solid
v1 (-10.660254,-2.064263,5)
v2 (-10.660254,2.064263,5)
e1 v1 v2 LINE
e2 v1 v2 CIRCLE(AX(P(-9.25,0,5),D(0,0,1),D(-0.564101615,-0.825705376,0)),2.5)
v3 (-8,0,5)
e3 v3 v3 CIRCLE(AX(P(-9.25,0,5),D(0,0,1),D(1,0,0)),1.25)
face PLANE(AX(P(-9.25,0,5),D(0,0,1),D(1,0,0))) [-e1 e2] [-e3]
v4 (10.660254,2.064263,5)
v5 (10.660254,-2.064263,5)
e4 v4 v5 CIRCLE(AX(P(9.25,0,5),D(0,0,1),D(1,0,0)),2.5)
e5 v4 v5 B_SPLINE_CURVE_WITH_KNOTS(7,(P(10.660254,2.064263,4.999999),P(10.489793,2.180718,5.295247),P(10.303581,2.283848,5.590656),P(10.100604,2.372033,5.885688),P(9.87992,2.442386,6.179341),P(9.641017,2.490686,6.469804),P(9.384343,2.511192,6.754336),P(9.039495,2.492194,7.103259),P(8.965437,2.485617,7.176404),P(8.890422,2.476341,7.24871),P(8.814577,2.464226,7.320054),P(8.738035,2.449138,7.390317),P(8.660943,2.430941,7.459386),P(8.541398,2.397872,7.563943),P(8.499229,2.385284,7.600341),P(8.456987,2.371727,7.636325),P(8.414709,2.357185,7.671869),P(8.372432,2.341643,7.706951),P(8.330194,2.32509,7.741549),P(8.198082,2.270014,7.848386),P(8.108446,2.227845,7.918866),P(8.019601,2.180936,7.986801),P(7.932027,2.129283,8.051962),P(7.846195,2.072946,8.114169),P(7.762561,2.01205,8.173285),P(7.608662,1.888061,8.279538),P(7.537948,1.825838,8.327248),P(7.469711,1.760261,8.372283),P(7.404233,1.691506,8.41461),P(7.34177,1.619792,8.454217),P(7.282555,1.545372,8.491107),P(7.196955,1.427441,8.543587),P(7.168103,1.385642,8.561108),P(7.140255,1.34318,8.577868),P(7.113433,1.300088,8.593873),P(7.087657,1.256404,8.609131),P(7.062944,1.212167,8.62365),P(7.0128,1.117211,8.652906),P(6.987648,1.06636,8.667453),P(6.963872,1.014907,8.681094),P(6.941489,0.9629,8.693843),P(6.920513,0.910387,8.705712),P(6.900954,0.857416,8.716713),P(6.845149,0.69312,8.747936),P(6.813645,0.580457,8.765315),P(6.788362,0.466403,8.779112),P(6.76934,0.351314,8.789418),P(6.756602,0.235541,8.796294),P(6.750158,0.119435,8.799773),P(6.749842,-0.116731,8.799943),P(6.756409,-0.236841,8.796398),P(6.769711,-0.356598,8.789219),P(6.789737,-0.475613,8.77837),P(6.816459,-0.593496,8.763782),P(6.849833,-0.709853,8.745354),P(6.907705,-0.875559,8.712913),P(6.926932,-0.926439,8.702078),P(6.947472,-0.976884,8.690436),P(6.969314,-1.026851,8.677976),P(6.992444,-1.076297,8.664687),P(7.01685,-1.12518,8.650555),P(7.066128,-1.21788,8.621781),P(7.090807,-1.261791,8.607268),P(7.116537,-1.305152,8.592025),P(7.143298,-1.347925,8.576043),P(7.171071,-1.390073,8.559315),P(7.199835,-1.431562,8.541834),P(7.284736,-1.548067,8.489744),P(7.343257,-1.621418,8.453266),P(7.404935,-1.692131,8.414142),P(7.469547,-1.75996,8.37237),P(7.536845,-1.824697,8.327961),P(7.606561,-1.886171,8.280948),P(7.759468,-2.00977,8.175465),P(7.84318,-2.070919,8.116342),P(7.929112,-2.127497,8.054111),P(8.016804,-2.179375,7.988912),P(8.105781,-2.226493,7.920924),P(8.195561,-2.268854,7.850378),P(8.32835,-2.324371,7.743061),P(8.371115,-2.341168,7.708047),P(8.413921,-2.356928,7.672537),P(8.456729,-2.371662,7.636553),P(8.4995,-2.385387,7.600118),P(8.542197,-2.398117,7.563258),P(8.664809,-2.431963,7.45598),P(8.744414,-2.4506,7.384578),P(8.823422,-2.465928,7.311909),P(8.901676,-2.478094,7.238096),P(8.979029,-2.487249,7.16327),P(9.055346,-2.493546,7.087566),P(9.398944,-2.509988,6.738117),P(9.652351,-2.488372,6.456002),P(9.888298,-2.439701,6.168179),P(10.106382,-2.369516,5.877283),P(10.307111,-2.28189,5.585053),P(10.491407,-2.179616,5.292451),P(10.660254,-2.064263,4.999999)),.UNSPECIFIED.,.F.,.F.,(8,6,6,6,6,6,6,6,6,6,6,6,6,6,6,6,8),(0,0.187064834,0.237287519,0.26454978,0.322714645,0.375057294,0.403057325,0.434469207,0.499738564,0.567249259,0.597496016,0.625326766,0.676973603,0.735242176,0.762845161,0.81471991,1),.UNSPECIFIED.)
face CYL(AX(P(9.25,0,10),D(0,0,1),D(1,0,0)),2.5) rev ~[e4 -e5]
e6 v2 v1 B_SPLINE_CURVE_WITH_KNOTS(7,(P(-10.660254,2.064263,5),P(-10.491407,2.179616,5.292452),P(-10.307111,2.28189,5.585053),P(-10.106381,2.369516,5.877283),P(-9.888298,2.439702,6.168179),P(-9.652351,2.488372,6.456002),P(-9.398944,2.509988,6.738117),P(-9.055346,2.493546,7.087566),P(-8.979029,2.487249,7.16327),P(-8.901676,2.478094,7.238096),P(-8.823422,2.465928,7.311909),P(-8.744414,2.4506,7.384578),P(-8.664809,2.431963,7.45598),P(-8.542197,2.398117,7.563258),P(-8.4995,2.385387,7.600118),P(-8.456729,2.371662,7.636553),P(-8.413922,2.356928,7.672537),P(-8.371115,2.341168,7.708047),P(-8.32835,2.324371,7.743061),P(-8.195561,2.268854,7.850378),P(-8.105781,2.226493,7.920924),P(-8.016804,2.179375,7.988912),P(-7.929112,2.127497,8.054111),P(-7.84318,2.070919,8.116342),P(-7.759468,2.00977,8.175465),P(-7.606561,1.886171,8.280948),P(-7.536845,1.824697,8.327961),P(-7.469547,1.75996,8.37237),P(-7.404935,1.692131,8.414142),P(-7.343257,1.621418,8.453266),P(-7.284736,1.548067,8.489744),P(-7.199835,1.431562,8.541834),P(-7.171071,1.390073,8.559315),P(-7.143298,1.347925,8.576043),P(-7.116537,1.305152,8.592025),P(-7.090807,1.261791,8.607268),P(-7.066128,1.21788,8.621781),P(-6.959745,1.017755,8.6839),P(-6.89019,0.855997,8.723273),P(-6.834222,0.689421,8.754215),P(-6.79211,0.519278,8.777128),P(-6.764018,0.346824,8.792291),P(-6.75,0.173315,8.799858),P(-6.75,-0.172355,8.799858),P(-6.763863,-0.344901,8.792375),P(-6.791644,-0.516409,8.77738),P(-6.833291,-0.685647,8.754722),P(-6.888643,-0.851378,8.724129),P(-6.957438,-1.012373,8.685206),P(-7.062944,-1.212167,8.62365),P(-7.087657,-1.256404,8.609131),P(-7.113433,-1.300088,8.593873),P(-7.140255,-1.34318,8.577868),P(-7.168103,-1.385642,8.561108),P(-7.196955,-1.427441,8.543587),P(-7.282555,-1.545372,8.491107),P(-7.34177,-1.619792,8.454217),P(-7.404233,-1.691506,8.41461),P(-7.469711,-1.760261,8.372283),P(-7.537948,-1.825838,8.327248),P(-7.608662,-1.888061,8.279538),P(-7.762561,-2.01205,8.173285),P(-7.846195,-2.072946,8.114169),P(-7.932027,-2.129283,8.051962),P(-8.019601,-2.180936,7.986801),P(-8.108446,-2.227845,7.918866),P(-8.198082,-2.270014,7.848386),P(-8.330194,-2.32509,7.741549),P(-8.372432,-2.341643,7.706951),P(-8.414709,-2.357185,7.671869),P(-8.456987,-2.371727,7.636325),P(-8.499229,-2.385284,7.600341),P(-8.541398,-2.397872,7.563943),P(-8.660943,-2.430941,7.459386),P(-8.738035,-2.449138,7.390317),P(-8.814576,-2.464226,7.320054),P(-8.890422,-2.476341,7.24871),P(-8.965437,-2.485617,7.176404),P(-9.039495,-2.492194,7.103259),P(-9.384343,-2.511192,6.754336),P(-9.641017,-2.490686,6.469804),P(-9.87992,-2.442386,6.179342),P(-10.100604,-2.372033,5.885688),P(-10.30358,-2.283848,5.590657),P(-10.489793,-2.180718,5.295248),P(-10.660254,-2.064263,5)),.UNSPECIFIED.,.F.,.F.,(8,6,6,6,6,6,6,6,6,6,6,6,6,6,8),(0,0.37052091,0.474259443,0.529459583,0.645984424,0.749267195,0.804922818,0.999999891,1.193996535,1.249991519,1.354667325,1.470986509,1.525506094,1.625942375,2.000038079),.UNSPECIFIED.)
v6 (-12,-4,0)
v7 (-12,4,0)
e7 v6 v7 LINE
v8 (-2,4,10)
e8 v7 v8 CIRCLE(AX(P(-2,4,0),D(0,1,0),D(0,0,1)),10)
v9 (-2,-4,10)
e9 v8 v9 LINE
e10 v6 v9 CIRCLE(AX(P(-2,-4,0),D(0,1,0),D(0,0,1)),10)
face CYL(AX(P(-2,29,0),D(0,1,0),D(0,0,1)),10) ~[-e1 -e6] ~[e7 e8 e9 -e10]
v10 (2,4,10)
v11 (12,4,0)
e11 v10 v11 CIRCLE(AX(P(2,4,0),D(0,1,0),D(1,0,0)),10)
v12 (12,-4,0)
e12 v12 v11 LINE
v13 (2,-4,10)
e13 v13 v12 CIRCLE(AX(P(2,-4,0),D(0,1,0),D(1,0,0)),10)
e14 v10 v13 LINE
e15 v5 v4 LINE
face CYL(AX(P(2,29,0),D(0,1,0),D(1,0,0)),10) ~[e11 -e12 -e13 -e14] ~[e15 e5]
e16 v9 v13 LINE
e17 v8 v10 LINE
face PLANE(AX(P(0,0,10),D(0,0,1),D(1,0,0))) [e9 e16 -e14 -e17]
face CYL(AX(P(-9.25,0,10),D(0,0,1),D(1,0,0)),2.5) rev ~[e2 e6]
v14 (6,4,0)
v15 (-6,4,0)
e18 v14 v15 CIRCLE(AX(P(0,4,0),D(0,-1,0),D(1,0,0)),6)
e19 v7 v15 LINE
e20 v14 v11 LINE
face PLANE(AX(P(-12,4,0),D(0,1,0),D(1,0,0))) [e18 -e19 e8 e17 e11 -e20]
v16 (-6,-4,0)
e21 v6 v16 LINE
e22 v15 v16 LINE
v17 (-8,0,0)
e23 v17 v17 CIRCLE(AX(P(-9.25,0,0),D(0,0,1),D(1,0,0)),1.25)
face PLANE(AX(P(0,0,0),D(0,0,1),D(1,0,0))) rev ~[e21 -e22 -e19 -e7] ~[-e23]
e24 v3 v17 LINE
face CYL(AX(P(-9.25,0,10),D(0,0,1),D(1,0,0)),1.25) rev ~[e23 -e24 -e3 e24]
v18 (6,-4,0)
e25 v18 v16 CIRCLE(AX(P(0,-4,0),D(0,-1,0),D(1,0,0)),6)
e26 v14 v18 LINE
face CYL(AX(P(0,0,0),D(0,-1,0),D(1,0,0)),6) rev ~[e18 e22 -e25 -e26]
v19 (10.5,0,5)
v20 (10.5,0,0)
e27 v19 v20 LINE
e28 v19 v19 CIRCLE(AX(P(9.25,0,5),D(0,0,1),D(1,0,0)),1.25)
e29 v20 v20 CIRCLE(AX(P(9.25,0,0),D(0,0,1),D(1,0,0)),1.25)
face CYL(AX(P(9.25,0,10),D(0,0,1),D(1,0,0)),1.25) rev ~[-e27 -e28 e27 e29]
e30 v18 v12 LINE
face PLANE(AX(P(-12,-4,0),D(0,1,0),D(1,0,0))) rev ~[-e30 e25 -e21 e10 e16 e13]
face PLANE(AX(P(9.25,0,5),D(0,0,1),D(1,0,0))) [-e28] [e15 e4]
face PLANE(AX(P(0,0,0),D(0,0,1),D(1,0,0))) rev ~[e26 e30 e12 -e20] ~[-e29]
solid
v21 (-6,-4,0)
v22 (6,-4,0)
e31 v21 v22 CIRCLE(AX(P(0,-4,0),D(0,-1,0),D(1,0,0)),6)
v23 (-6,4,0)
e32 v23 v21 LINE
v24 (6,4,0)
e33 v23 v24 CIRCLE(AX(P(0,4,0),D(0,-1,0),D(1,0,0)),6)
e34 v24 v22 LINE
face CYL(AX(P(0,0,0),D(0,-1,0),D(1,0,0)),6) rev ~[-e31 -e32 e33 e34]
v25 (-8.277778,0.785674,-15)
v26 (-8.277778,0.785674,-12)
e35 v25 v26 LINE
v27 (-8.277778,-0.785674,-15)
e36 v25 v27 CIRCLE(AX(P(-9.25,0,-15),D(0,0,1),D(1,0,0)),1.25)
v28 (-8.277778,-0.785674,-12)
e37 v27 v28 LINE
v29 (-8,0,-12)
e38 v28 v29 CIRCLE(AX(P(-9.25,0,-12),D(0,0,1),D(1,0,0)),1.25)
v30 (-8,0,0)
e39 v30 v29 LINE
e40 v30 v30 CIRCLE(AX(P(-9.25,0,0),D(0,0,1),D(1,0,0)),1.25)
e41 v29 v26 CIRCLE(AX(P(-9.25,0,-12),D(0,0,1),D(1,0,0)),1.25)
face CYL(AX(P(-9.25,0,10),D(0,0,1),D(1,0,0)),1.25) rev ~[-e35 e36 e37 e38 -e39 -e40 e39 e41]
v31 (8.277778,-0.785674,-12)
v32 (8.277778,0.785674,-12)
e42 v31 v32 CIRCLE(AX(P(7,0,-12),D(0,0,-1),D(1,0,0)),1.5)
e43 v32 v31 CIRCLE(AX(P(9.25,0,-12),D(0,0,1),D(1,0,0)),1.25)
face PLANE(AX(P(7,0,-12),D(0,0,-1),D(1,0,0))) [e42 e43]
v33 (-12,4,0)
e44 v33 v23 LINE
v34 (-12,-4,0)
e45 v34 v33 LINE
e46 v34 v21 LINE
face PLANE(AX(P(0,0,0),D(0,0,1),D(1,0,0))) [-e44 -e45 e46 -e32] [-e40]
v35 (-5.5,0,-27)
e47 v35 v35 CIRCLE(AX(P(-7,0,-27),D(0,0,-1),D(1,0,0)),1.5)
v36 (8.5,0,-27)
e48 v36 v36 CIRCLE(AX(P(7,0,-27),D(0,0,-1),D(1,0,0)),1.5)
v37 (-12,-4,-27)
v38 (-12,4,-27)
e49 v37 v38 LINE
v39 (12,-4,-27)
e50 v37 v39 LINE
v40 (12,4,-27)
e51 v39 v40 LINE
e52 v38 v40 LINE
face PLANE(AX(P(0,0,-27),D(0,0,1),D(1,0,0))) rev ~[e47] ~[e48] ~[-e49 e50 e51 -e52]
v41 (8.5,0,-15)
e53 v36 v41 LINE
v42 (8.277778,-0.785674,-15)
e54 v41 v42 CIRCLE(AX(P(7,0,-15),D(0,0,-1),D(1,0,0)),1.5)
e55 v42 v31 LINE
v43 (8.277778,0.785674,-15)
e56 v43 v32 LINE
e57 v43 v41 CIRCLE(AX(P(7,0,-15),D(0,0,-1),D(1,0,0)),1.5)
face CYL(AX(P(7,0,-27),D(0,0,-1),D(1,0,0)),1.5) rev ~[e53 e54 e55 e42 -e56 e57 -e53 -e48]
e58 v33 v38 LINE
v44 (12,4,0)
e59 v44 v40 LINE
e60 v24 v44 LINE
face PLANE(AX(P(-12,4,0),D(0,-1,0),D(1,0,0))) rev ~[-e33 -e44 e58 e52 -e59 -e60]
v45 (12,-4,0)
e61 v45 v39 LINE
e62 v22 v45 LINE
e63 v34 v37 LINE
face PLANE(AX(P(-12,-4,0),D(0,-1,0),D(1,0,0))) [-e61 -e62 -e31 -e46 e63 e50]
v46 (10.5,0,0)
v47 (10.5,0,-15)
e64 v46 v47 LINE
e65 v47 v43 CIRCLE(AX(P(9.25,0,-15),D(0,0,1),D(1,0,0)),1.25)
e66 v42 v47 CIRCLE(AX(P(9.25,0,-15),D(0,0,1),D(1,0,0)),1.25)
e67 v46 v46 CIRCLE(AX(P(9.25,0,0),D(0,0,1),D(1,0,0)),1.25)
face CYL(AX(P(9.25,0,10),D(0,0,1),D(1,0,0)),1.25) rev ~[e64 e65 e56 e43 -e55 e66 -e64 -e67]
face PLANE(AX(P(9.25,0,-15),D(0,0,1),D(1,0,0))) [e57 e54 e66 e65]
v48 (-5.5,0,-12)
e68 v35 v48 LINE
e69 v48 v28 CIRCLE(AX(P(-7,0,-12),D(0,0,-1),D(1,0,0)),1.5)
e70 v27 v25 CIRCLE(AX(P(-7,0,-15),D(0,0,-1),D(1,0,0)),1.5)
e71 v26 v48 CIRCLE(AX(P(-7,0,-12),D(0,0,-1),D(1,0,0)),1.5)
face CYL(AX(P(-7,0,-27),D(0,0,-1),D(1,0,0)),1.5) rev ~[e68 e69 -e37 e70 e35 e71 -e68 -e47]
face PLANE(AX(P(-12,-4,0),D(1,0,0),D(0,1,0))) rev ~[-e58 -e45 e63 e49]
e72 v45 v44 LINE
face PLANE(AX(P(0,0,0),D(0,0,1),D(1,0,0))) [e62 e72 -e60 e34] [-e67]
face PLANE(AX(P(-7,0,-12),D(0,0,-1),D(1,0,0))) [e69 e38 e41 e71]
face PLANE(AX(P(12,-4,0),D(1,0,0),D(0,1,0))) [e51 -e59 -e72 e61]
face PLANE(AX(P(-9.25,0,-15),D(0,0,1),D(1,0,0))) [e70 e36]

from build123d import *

# Parameters (mm, degrees)
F0_W         = 24
F0_H         = 8
F1_DEPTH     = 27
F2_W         = 24
F2_H         = 8
F3_DEPTH     = 10
F4_R         = 6
F5_DEPTH     = 12.5
F6_R         = 1.25
F7_DEPTH     = 25
F8_R         = 1.5
F9_DEPTH     = 15
F10_R        = 2.5
F11_DEPTH    = 5
F12_T1_DEPTH = 58


# Not quite as in the source:
# - a fillet or chamfer that OpenCascade refuses, or shapes differently, is made with other operations: its cross-section is extruded or revolved along the edge and cut away or added


with BuildPart() as f1:
    # F0 (on Top) → F1 (new body)
    with BuildSketch(Plane.XY):
        Rectangle(F0_W, F0_H)
    extrude(amount=-F1_DEPTH)


with BuildPart() as f3:
    # F2 (on Top) → F3 (new body)
    with BuildSketch(Plane.XY):
        Rectangle(F2_W, F2_H)
    extrude(amount=F3_DEPTH)


with BuildPart() as f5_tool:
    # F4 (on Front) → F5 (new body, symmetric)
    with BuildSketch(Plane.XZ):
        Circle(F4_R)
    extrude(amount=F5_DEPTH, both=True)


with BuildPart() as f1_1:
    add(f1.part)

    # F5: cut by f5_tool
    add(f5_tool.part, mode=Mode.SUBTRACT)


with BuildPart() as f3_1:
    add(f3.part)

    # F5: cut by f5_tool
    add(f5_tool.part, mode=Mode.SUBTRACT)


with BuildPart() as f7_tool:
    # F6 (on face) → F7 (new body)
    with BuildSketch(Plane.XY.offset(10)):
        with Locations((9.25, 0)):
            Circle(F6_R)
        with Locations((-9.25, 0)):
            Circle(F6_R)
    extrude(amount=-F7_DEPTH)


with BuildPart() as f1_2:
    add(f1_1.part)

    # F7: cut by f7_tool
    add(f7_tool.part, mode=Mode.SUBTRACT)

    # F8 (on face) → F9 (cut)
    with BuildSketch(Plane(origin=(0, 0, -27), x_dir=(1, 0, 0), z_dir=(0, 0, -1))):
        with Locations((7, 0)):
            Circle(F8_R)
        with Locations((-7, 0)):
            Circle(F8_R)
    extrude(amount=-F9_DEPTH, mode=Mode.SUBTRACT)


with BuildPart() as f3_2:
    add(f3_1.part)

    # F7: cut by f7_tool
    add(f7_tool.part, mode=Mode.SUBTRACT)

    # F10 (on face) → F11 (cut)
    with BuildSketch(Plane.XY.offset(10)):
        with Locations((9.25, 0)):
            Circle(F10_R)
        with Locations((-9.25, 0)):
            Circle(F10_R)
    extrude(amount=-F11_DEPTH, mode=Mode.SUBTRACT)

    # F12: fillet of radius 10 on 2 edges, made by hand

    # F12_s2 → F12_t1 (cut)
    with BuildSketch(Plane.XZ.offset(-29)):
        with BuildLine():
            ThreePointArc((12, 0), (9.0710678119, 7.0710678119), (2, 10))
            Line((2, 10), (12, 10))
            Line((12, 10), (12, 0))
        make_face()
        with BuildLine():
            ThreePointArc((-2, 10), (-9.0710678119, 7.0710678119), (-12, 0))
            Line((-12, 0), (-12, 10))
            Line((-12, 10), (-2, 10))
        make_face()
    extrude(amount=F12_T1_DEPTH, mode=Mode.SUBTRACT)


solid = Compound([f1_2.part, f3_2.part])
